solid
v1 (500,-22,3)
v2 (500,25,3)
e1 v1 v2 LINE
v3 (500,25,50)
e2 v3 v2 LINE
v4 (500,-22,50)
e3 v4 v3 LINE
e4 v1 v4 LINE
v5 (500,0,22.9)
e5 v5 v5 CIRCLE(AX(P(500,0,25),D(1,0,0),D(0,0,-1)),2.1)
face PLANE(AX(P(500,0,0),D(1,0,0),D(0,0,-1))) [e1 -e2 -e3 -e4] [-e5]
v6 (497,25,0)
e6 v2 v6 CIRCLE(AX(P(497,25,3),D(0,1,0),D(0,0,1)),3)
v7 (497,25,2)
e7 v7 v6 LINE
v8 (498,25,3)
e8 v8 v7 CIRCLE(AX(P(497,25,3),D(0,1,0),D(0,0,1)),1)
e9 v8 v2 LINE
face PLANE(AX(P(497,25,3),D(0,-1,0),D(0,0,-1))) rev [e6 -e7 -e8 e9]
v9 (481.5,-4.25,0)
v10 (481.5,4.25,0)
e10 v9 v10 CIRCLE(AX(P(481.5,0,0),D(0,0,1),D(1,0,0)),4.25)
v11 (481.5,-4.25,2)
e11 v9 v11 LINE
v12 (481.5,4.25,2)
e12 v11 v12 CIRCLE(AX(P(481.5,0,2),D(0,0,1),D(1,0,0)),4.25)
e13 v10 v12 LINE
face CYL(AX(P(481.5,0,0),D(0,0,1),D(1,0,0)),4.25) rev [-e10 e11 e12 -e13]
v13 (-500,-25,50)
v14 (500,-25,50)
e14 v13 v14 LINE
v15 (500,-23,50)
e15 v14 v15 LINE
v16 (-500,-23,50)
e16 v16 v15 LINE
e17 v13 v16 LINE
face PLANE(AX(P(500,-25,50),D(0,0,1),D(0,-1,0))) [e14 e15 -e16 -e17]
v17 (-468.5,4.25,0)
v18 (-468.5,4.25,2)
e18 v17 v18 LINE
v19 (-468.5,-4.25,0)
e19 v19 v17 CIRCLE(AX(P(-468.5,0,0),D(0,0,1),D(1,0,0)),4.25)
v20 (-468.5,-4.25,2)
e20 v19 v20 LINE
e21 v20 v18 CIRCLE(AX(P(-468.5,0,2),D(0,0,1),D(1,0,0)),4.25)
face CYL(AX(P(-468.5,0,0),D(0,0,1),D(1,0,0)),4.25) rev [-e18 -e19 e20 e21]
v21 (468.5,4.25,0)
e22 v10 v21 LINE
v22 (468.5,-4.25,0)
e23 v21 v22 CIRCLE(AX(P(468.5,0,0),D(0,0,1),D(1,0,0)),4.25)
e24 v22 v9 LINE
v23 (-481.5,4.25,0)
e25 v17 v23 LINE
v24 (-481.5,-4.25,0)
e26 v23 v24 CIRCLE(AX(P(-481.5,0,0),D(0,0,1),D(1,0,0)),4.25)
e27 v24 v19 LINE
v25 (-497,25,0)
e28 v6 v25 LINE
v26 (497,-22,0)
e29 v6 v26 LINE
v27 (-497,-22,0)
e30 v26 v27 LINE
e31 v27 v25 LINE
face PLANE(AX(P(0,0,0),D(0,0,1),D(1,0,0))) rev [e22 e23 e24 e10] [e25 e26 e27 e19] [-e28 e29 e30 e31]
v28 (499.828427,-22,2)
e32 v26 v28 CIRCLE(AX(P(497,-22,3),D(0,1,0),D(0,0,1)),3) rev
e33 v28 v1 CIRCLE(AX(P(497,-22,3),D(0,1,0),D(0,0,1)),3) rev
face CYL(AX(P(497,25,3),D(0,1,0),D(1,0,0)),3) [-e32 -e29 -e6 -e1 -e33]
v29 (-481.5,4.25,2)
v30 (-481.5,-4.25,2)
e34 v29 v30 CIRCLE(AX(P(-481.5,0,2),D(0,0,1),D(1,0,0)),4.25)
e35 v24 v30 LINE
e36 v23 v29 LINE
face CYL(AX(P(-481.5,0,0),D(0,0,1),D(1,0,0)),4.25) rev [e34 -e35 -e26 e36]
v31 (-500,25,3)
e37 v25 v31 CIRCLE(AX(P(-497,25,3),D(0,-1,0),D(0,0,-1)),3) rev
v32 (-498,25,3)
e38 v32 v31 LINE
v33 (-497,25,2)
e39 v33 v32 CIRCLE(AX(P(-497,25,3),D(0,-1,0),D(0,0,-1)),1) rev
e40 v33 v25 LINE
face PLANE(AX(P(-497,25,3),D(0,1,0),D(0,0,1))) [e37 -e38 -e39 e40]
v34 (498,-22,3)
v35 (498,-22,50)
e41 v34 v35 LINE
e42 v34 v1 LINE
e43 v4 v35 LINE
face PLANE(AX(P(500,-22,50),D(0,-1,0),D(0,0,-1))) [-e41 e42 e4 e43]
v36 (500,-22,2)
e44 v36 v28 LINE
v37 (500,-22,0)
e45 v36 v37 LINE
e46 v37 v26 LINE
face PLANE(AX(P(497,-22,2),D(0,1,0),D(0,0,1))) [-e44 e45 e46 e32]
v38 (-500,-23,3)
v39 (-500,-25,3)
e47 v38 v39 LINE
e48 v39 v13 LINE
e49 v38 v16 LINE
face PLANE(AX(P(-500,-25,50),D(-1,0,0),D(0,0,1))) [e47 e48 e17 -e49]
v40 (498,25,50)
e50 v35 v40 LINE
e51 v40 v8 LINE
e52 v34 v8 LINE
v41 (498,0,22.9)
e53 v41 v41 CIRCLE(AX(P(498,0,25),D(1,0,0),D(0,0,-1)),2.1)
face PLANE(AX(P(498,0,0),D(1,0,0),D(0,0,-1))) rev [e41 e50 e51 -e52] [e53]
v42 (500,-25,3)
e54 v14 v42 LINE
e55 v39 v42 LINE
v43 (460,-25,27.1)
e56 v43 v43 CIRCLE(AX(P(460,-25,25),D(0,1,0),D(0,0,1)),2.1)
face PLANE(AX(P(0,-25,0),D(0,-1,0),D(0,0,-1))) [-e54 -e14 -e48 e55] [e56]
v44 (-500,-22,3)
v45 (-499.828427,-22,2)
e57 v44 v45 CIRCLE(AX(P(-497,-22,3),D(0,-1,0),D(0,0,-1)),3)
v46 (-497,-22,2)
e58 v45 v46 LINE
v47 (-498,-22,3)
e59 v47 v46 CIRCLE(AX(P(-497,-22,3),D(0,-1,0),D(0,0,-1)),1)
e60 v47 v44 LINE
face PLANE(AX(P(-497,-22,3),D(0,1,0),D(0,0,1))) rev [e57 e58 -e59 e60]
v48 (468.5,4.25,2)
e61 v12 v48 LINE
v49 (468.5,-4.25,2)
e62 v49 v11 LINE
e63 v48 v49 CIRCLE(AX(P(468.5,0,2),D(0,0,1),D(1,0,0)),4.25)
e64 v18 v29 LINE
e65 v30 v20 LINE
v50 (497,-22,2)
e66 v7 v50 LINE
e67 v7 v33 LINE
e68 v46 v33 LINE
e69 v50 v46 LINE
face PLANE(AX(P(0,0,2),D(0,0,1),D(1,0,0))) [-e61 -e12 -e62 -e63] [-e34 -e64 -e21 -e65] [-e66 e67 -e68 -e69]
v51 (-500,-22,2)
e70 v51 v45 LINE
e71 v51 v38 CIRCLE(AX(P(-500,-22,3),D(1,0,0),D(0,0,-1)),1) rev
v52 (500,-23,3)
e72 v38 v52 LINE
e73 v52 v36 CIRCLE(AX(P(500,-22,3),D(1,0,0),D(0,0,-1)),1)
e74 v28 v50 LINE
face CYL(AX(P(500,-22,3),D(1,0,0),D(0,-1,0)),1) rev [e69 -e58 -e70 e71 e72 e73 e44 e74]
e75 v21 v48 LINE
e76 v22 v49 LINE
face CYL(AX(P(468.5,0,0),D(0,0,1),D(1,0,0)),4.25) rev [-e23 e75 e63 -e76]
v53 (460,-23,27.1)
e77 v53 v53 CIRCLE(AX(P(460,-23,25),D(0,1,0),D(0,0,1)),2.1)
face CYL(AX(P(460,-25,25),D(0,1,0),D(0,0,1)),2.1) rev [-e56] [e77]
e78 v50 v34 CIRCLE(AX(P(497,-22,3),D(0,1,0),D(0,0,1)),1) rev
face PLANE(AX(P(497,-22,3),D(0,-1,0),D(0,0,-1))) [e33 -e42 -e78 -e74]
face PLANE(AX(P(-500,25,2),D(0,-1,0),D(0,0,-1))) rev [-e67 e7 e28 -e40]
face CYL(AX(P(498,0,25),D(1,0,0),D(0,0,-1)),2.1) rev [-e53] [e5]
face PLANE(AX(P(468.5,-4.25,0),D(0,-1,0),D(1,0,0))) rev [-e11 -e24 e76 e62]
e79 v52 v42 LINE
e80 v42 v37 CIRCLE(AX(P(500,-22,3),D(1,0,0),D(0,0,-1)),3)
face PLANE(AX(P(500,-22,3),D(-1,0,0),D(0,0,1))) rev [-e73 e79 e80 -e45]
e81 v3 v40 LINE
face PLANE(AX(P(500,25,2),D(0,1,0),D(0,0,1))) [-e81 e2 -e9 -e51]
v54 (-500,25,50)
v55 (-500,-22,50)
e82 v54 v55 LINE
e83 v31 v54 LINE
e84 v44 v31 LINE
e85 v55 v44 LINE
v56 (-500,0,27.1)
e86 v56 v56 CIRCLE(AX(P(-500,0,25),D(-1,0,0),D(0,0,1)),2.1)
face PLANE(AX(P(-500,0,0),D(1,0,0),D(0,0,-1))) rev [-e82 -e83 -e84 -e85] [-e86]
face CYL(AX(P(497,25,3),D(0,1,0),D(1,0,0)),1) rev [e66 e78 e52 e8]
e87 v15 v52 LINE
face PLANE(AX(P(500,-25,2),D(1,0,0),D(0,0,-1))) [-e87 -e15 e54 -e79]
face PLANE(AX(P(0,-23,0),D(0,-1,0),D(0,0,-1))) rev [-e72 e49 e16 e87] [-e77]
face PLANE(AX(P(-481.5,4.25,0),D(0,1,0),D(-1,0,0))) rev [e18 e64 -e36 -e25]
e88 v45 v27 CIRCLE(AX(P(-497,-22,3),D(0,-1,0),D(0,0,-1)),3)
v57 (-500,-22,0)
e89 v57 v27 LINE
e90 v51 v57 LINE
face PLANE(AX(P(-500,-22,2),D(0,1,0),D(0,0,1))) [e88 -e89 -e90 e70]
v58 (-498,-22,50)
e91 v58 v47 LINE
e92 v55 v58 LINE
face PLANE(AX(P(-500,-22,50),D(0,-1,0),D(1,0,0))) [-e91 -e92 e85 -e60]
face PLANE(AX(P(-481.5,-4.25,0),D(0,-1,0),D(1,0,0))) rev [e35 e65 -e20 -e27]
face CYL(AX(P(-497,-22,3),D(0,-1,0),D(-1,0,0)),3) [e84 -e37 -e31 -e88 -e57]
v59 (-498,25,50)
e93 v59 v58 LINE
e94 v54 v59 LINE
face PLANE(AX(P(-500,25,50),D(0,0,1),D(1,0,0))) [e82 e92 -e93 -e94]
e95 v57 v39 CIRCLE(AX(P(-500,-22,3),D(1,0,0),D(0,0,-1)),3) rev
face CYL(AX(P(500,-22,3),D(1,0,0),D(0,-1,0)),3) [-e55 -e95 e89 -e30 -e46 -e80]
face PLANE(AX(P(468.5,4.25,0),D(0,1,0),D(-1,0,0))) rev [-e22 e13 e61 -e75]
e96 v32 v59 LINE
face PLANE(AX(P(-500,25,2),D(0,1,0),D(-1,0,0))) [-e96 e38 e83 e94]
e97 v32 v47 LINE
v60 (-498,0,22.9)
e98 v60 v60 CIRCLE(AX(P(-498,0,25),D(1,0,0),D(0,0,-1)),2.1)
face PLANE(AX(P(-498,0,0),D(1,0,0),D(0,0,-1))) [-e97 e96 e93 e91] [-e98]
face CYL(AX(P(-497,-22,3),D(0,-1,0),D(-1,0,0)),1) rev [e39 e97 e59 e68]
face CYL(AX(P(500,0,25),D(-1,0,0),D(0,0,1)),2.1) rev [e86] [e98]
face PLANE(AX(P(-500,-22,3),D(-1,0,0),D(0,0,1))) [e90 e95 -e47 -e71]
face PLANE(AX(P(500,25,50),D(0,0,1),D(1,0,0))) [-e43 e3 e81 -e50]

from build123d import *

# Parameters (mm, degrees)
BASEFLANGE_W                 = 1000
BASEFLANGE_H                 = 50
BASEFLANGE1_DEPTH            = 2
EDGE_FLANGE2_STRIP_W         = 10
EDGE_FLANGE2_STRIP_H         = 2
EDGE_FLANGE2_STRIP_CUT_DEPTH = 1000
EDGE_FLANGE2_DEPTH           = 1000
SKETCH12_R                   = 2.1
F_4_2MM_HOLE_DEPTH           = 10
SLOT_1_DEPTH                 = 10
LEFT_EDGE_STRIP_W            = 10
LEFT_EDGE_STRIP_H            = 2
LEFT_EDGE_STRIP_CUT_DEPTH    = 47
LEFT_EDGE_DEPTH              = 47
CUT_EXTRUDE1_DEPTH           = 1002.561281201
CUT_EXTRUDE1_DEPTH_BACK      = 1002.561281201
SKETCH19_R                   = 2.1
RIGHT_EDGE_STRIP_W           = 10
RIGHT_EDGE_STRIP_H           = 2
RIGHT_EDGE_STRIP_CUT_DEPTH   = 47
RIGHT_EDGE_DEPTH             = 47
CUT_EXTRUDE2_START           = -10
SKETCH25_R                   = 2.1
CUT_EXTRUDE2_DEPTH           = 10


# Sheet-metal steps are written as plain solids
with BuildPart() as part:
    # BaseFlange → BaseFlange1 (new body)
    with BuildSketch(Plane.XY):
        Rectangle(BASEFLANGE_W, BASEFLANGE_H)
    extrude(amount=BASEFLANGE1_DEPTH)

    # Edge-Flange2 strip (across the edge) → Edge-Flange2 strip cut (cut)
    with BuildSketch(Plane(origin=(-500, -25, 2), x_dir=(0, 1, 0), z_dir=(1, 0, 0))):
        with Locations((-2, -1)):
            Rectangle(EDGE_FLANGE2_STRIP_W, EDGE_FLANGE2_STRIP_H)
    extrude(amount=EDGE_FLANGE2_STRIP_CUT_DEPTH, mode=Mode.SUBTRACT)

    # Edge-Flange2 section (across the edge) → Edge-Flange2 (add)
    with BuildSketch(Plane(origin=(-500, -25, 2), x_dir=(0, 1, 0), z_dir=(1, 0, 0))):
        with BuildLine():
            Line((0, 1), (0, 48))
            Line((0, 48), (2, 48))
            Line((2, 48), (2, 1))
            ThreePointArc((2, 1), (2.292893219, 0.292893219), (3, 0))
            Line((3, 0), (3, -2))
            ThreePointArc((3, -2), (0.878679656, -1.121320344), (0, 1))
        make_face()
    extrude(amount=EDGE_FLANGE2_DEPTH)

    # Sketch12 → 4.2mm Hole (cut)
    with BuildSketch(Plane(origin=(0, -23, 0), x_dir=(1, 0, 0), z_dir=(0, 1, 0))):
        with Locations(Location((460, -25, 0), (0, 0, 270))):
            Circle(SKETCH12_R)
    extrude(amount=-F_4_2MM_HOLE_DEPTH, mode=Mode.SUBTRACT)

    # slot1 → Slot 1 (cut)
    with BuildSketch(Plane.XY.offset(2)):
        with BuildLine():
            Line((468.5, 4.25), (481.5, 4.25))
            ThreePointArc((481.5, 4.25), (485.75, 0), (481.5, -4.25))
            Line((481.5, -4.25), (468.5, -4.25))
            ThreePointArc((468.5, -4.25), (464.25, 0), (468.5, 4.25))
        make_face()
    slot_1 = extrude(amount=-SLOT_1_DEPTH, mode=Mode.SUBTRACT)

    # Slot Pattern: Slot 1 at 1 more place
    with Locations((-950, 0, 0)):
        add(slot_1, mode=Mode.SUBTRACT)

    # Left Edge strip (across the edge) → Left Edge strip cut (cut)
    with BuildSketch(Plane(origin=(-500, 25, 2), x_dir=(1, 0, 0), z_dir=(0, -1, 0))):
        with Locations((-2, -1)):
            Rectangle(LEFT_EDGE_STRIP_W, LEFT_EDGE_STRIP_H)
    extrude(amount=LEFT_EDGE_STRIP_CUT_DEPTH, mode=Mode.SUBTRACT)

    # Left Edge section (across the edge) → Left Edge (add)
    with BuildSketch(Plane(origin=(-500, 25, 2), x_dir=(1, 0, 0), z_dir=(0, -1, 0))):
        with BuildLine():
            Line((0, 1), (0, 48))
            Line((0, 48), (2, 48))
            Line((2, 48), (2, 1))
            ThreePointArc((2, 1), (2.292893219, 0.292893219), (3, 0))
            Line((3, 0), (3, -2))
            ThreePointArc((3, -2), (0.878679656, -1.121320344), (0, 1))
        make_face()
    extrude(amount=LEFT_EDGE_DEPTH)

    # Sketch19 → Cut-Extrude1 (cut, two sides: drawn at the far end of the back side and taken through both)
    with BuildSketch(Plane.ZY.offset(500).offset(-CUT_EXTRUDE1_DEPTH_BACK)):
        with Locations((25, 0)):
            Circle(SKETCH19_R)
    extrude(amount=CUT_EXTRUDE1_DEPTH + CUT_EXTRUDE1_DEPTH_BACK, mode=Mode.SUBTRACT)

    # Right Edge strip (across the edge) → Right Edge strip cut (cut)
    with BuildSketch(Plane(origin=(500, -22, 2), x_dir=(-1, 0, 0), z_dir=(0, 1, 0))):
        with Locations((-2, -1)):
            Rectangle(RIGHT_EDGE_STRIP_W, RIGHT_EDGE_STRIP_H)
    extrude(amount=RIGHT_EDGE_STRIP_CUT_DEPTH, mode=Mode.SUBTRACT)

    # Right Edge section (across the edge) → Right Edge (add)
    with BuildSketch(Plane(origin=(500, -22, 2), x_dir=(-1, 0, 0), z_dir=(0, 1, 0))):
        with BuildLine():
            Line((0, 1), (0, 48))
            Line((0, 48), (2, 48))
            Line((2, 48), (2, 1))
            ThreePointArc((2, 1), (2.292893219, 0.292893219), (3, 0))
            Line((3, 0), (3, -2))
            ThreePointArc((3, -2), (0.878679656, -1.121320344), (0, 1))
        make_face()
    extrude(amount=RIGHT_EDGE_DEPTH)

    # Sketch25 → Cut-Extrude2 (cut)
    with BuildSketch(Plane(origin=(500, 0, 0), x_dir=(0, 0, -1), z_dir=(1, 0, 0)).offset(CUT_EXTRUDE2_START)):
        with Locations(Location((-25, 0, 0), (0, 0, 180))):
            Circle(SKETCH25_R)
    extrude(amount=CUT_EXTRUDE2_DEPTH, mode=Mode.SUBTRACT)


solid = part.part
